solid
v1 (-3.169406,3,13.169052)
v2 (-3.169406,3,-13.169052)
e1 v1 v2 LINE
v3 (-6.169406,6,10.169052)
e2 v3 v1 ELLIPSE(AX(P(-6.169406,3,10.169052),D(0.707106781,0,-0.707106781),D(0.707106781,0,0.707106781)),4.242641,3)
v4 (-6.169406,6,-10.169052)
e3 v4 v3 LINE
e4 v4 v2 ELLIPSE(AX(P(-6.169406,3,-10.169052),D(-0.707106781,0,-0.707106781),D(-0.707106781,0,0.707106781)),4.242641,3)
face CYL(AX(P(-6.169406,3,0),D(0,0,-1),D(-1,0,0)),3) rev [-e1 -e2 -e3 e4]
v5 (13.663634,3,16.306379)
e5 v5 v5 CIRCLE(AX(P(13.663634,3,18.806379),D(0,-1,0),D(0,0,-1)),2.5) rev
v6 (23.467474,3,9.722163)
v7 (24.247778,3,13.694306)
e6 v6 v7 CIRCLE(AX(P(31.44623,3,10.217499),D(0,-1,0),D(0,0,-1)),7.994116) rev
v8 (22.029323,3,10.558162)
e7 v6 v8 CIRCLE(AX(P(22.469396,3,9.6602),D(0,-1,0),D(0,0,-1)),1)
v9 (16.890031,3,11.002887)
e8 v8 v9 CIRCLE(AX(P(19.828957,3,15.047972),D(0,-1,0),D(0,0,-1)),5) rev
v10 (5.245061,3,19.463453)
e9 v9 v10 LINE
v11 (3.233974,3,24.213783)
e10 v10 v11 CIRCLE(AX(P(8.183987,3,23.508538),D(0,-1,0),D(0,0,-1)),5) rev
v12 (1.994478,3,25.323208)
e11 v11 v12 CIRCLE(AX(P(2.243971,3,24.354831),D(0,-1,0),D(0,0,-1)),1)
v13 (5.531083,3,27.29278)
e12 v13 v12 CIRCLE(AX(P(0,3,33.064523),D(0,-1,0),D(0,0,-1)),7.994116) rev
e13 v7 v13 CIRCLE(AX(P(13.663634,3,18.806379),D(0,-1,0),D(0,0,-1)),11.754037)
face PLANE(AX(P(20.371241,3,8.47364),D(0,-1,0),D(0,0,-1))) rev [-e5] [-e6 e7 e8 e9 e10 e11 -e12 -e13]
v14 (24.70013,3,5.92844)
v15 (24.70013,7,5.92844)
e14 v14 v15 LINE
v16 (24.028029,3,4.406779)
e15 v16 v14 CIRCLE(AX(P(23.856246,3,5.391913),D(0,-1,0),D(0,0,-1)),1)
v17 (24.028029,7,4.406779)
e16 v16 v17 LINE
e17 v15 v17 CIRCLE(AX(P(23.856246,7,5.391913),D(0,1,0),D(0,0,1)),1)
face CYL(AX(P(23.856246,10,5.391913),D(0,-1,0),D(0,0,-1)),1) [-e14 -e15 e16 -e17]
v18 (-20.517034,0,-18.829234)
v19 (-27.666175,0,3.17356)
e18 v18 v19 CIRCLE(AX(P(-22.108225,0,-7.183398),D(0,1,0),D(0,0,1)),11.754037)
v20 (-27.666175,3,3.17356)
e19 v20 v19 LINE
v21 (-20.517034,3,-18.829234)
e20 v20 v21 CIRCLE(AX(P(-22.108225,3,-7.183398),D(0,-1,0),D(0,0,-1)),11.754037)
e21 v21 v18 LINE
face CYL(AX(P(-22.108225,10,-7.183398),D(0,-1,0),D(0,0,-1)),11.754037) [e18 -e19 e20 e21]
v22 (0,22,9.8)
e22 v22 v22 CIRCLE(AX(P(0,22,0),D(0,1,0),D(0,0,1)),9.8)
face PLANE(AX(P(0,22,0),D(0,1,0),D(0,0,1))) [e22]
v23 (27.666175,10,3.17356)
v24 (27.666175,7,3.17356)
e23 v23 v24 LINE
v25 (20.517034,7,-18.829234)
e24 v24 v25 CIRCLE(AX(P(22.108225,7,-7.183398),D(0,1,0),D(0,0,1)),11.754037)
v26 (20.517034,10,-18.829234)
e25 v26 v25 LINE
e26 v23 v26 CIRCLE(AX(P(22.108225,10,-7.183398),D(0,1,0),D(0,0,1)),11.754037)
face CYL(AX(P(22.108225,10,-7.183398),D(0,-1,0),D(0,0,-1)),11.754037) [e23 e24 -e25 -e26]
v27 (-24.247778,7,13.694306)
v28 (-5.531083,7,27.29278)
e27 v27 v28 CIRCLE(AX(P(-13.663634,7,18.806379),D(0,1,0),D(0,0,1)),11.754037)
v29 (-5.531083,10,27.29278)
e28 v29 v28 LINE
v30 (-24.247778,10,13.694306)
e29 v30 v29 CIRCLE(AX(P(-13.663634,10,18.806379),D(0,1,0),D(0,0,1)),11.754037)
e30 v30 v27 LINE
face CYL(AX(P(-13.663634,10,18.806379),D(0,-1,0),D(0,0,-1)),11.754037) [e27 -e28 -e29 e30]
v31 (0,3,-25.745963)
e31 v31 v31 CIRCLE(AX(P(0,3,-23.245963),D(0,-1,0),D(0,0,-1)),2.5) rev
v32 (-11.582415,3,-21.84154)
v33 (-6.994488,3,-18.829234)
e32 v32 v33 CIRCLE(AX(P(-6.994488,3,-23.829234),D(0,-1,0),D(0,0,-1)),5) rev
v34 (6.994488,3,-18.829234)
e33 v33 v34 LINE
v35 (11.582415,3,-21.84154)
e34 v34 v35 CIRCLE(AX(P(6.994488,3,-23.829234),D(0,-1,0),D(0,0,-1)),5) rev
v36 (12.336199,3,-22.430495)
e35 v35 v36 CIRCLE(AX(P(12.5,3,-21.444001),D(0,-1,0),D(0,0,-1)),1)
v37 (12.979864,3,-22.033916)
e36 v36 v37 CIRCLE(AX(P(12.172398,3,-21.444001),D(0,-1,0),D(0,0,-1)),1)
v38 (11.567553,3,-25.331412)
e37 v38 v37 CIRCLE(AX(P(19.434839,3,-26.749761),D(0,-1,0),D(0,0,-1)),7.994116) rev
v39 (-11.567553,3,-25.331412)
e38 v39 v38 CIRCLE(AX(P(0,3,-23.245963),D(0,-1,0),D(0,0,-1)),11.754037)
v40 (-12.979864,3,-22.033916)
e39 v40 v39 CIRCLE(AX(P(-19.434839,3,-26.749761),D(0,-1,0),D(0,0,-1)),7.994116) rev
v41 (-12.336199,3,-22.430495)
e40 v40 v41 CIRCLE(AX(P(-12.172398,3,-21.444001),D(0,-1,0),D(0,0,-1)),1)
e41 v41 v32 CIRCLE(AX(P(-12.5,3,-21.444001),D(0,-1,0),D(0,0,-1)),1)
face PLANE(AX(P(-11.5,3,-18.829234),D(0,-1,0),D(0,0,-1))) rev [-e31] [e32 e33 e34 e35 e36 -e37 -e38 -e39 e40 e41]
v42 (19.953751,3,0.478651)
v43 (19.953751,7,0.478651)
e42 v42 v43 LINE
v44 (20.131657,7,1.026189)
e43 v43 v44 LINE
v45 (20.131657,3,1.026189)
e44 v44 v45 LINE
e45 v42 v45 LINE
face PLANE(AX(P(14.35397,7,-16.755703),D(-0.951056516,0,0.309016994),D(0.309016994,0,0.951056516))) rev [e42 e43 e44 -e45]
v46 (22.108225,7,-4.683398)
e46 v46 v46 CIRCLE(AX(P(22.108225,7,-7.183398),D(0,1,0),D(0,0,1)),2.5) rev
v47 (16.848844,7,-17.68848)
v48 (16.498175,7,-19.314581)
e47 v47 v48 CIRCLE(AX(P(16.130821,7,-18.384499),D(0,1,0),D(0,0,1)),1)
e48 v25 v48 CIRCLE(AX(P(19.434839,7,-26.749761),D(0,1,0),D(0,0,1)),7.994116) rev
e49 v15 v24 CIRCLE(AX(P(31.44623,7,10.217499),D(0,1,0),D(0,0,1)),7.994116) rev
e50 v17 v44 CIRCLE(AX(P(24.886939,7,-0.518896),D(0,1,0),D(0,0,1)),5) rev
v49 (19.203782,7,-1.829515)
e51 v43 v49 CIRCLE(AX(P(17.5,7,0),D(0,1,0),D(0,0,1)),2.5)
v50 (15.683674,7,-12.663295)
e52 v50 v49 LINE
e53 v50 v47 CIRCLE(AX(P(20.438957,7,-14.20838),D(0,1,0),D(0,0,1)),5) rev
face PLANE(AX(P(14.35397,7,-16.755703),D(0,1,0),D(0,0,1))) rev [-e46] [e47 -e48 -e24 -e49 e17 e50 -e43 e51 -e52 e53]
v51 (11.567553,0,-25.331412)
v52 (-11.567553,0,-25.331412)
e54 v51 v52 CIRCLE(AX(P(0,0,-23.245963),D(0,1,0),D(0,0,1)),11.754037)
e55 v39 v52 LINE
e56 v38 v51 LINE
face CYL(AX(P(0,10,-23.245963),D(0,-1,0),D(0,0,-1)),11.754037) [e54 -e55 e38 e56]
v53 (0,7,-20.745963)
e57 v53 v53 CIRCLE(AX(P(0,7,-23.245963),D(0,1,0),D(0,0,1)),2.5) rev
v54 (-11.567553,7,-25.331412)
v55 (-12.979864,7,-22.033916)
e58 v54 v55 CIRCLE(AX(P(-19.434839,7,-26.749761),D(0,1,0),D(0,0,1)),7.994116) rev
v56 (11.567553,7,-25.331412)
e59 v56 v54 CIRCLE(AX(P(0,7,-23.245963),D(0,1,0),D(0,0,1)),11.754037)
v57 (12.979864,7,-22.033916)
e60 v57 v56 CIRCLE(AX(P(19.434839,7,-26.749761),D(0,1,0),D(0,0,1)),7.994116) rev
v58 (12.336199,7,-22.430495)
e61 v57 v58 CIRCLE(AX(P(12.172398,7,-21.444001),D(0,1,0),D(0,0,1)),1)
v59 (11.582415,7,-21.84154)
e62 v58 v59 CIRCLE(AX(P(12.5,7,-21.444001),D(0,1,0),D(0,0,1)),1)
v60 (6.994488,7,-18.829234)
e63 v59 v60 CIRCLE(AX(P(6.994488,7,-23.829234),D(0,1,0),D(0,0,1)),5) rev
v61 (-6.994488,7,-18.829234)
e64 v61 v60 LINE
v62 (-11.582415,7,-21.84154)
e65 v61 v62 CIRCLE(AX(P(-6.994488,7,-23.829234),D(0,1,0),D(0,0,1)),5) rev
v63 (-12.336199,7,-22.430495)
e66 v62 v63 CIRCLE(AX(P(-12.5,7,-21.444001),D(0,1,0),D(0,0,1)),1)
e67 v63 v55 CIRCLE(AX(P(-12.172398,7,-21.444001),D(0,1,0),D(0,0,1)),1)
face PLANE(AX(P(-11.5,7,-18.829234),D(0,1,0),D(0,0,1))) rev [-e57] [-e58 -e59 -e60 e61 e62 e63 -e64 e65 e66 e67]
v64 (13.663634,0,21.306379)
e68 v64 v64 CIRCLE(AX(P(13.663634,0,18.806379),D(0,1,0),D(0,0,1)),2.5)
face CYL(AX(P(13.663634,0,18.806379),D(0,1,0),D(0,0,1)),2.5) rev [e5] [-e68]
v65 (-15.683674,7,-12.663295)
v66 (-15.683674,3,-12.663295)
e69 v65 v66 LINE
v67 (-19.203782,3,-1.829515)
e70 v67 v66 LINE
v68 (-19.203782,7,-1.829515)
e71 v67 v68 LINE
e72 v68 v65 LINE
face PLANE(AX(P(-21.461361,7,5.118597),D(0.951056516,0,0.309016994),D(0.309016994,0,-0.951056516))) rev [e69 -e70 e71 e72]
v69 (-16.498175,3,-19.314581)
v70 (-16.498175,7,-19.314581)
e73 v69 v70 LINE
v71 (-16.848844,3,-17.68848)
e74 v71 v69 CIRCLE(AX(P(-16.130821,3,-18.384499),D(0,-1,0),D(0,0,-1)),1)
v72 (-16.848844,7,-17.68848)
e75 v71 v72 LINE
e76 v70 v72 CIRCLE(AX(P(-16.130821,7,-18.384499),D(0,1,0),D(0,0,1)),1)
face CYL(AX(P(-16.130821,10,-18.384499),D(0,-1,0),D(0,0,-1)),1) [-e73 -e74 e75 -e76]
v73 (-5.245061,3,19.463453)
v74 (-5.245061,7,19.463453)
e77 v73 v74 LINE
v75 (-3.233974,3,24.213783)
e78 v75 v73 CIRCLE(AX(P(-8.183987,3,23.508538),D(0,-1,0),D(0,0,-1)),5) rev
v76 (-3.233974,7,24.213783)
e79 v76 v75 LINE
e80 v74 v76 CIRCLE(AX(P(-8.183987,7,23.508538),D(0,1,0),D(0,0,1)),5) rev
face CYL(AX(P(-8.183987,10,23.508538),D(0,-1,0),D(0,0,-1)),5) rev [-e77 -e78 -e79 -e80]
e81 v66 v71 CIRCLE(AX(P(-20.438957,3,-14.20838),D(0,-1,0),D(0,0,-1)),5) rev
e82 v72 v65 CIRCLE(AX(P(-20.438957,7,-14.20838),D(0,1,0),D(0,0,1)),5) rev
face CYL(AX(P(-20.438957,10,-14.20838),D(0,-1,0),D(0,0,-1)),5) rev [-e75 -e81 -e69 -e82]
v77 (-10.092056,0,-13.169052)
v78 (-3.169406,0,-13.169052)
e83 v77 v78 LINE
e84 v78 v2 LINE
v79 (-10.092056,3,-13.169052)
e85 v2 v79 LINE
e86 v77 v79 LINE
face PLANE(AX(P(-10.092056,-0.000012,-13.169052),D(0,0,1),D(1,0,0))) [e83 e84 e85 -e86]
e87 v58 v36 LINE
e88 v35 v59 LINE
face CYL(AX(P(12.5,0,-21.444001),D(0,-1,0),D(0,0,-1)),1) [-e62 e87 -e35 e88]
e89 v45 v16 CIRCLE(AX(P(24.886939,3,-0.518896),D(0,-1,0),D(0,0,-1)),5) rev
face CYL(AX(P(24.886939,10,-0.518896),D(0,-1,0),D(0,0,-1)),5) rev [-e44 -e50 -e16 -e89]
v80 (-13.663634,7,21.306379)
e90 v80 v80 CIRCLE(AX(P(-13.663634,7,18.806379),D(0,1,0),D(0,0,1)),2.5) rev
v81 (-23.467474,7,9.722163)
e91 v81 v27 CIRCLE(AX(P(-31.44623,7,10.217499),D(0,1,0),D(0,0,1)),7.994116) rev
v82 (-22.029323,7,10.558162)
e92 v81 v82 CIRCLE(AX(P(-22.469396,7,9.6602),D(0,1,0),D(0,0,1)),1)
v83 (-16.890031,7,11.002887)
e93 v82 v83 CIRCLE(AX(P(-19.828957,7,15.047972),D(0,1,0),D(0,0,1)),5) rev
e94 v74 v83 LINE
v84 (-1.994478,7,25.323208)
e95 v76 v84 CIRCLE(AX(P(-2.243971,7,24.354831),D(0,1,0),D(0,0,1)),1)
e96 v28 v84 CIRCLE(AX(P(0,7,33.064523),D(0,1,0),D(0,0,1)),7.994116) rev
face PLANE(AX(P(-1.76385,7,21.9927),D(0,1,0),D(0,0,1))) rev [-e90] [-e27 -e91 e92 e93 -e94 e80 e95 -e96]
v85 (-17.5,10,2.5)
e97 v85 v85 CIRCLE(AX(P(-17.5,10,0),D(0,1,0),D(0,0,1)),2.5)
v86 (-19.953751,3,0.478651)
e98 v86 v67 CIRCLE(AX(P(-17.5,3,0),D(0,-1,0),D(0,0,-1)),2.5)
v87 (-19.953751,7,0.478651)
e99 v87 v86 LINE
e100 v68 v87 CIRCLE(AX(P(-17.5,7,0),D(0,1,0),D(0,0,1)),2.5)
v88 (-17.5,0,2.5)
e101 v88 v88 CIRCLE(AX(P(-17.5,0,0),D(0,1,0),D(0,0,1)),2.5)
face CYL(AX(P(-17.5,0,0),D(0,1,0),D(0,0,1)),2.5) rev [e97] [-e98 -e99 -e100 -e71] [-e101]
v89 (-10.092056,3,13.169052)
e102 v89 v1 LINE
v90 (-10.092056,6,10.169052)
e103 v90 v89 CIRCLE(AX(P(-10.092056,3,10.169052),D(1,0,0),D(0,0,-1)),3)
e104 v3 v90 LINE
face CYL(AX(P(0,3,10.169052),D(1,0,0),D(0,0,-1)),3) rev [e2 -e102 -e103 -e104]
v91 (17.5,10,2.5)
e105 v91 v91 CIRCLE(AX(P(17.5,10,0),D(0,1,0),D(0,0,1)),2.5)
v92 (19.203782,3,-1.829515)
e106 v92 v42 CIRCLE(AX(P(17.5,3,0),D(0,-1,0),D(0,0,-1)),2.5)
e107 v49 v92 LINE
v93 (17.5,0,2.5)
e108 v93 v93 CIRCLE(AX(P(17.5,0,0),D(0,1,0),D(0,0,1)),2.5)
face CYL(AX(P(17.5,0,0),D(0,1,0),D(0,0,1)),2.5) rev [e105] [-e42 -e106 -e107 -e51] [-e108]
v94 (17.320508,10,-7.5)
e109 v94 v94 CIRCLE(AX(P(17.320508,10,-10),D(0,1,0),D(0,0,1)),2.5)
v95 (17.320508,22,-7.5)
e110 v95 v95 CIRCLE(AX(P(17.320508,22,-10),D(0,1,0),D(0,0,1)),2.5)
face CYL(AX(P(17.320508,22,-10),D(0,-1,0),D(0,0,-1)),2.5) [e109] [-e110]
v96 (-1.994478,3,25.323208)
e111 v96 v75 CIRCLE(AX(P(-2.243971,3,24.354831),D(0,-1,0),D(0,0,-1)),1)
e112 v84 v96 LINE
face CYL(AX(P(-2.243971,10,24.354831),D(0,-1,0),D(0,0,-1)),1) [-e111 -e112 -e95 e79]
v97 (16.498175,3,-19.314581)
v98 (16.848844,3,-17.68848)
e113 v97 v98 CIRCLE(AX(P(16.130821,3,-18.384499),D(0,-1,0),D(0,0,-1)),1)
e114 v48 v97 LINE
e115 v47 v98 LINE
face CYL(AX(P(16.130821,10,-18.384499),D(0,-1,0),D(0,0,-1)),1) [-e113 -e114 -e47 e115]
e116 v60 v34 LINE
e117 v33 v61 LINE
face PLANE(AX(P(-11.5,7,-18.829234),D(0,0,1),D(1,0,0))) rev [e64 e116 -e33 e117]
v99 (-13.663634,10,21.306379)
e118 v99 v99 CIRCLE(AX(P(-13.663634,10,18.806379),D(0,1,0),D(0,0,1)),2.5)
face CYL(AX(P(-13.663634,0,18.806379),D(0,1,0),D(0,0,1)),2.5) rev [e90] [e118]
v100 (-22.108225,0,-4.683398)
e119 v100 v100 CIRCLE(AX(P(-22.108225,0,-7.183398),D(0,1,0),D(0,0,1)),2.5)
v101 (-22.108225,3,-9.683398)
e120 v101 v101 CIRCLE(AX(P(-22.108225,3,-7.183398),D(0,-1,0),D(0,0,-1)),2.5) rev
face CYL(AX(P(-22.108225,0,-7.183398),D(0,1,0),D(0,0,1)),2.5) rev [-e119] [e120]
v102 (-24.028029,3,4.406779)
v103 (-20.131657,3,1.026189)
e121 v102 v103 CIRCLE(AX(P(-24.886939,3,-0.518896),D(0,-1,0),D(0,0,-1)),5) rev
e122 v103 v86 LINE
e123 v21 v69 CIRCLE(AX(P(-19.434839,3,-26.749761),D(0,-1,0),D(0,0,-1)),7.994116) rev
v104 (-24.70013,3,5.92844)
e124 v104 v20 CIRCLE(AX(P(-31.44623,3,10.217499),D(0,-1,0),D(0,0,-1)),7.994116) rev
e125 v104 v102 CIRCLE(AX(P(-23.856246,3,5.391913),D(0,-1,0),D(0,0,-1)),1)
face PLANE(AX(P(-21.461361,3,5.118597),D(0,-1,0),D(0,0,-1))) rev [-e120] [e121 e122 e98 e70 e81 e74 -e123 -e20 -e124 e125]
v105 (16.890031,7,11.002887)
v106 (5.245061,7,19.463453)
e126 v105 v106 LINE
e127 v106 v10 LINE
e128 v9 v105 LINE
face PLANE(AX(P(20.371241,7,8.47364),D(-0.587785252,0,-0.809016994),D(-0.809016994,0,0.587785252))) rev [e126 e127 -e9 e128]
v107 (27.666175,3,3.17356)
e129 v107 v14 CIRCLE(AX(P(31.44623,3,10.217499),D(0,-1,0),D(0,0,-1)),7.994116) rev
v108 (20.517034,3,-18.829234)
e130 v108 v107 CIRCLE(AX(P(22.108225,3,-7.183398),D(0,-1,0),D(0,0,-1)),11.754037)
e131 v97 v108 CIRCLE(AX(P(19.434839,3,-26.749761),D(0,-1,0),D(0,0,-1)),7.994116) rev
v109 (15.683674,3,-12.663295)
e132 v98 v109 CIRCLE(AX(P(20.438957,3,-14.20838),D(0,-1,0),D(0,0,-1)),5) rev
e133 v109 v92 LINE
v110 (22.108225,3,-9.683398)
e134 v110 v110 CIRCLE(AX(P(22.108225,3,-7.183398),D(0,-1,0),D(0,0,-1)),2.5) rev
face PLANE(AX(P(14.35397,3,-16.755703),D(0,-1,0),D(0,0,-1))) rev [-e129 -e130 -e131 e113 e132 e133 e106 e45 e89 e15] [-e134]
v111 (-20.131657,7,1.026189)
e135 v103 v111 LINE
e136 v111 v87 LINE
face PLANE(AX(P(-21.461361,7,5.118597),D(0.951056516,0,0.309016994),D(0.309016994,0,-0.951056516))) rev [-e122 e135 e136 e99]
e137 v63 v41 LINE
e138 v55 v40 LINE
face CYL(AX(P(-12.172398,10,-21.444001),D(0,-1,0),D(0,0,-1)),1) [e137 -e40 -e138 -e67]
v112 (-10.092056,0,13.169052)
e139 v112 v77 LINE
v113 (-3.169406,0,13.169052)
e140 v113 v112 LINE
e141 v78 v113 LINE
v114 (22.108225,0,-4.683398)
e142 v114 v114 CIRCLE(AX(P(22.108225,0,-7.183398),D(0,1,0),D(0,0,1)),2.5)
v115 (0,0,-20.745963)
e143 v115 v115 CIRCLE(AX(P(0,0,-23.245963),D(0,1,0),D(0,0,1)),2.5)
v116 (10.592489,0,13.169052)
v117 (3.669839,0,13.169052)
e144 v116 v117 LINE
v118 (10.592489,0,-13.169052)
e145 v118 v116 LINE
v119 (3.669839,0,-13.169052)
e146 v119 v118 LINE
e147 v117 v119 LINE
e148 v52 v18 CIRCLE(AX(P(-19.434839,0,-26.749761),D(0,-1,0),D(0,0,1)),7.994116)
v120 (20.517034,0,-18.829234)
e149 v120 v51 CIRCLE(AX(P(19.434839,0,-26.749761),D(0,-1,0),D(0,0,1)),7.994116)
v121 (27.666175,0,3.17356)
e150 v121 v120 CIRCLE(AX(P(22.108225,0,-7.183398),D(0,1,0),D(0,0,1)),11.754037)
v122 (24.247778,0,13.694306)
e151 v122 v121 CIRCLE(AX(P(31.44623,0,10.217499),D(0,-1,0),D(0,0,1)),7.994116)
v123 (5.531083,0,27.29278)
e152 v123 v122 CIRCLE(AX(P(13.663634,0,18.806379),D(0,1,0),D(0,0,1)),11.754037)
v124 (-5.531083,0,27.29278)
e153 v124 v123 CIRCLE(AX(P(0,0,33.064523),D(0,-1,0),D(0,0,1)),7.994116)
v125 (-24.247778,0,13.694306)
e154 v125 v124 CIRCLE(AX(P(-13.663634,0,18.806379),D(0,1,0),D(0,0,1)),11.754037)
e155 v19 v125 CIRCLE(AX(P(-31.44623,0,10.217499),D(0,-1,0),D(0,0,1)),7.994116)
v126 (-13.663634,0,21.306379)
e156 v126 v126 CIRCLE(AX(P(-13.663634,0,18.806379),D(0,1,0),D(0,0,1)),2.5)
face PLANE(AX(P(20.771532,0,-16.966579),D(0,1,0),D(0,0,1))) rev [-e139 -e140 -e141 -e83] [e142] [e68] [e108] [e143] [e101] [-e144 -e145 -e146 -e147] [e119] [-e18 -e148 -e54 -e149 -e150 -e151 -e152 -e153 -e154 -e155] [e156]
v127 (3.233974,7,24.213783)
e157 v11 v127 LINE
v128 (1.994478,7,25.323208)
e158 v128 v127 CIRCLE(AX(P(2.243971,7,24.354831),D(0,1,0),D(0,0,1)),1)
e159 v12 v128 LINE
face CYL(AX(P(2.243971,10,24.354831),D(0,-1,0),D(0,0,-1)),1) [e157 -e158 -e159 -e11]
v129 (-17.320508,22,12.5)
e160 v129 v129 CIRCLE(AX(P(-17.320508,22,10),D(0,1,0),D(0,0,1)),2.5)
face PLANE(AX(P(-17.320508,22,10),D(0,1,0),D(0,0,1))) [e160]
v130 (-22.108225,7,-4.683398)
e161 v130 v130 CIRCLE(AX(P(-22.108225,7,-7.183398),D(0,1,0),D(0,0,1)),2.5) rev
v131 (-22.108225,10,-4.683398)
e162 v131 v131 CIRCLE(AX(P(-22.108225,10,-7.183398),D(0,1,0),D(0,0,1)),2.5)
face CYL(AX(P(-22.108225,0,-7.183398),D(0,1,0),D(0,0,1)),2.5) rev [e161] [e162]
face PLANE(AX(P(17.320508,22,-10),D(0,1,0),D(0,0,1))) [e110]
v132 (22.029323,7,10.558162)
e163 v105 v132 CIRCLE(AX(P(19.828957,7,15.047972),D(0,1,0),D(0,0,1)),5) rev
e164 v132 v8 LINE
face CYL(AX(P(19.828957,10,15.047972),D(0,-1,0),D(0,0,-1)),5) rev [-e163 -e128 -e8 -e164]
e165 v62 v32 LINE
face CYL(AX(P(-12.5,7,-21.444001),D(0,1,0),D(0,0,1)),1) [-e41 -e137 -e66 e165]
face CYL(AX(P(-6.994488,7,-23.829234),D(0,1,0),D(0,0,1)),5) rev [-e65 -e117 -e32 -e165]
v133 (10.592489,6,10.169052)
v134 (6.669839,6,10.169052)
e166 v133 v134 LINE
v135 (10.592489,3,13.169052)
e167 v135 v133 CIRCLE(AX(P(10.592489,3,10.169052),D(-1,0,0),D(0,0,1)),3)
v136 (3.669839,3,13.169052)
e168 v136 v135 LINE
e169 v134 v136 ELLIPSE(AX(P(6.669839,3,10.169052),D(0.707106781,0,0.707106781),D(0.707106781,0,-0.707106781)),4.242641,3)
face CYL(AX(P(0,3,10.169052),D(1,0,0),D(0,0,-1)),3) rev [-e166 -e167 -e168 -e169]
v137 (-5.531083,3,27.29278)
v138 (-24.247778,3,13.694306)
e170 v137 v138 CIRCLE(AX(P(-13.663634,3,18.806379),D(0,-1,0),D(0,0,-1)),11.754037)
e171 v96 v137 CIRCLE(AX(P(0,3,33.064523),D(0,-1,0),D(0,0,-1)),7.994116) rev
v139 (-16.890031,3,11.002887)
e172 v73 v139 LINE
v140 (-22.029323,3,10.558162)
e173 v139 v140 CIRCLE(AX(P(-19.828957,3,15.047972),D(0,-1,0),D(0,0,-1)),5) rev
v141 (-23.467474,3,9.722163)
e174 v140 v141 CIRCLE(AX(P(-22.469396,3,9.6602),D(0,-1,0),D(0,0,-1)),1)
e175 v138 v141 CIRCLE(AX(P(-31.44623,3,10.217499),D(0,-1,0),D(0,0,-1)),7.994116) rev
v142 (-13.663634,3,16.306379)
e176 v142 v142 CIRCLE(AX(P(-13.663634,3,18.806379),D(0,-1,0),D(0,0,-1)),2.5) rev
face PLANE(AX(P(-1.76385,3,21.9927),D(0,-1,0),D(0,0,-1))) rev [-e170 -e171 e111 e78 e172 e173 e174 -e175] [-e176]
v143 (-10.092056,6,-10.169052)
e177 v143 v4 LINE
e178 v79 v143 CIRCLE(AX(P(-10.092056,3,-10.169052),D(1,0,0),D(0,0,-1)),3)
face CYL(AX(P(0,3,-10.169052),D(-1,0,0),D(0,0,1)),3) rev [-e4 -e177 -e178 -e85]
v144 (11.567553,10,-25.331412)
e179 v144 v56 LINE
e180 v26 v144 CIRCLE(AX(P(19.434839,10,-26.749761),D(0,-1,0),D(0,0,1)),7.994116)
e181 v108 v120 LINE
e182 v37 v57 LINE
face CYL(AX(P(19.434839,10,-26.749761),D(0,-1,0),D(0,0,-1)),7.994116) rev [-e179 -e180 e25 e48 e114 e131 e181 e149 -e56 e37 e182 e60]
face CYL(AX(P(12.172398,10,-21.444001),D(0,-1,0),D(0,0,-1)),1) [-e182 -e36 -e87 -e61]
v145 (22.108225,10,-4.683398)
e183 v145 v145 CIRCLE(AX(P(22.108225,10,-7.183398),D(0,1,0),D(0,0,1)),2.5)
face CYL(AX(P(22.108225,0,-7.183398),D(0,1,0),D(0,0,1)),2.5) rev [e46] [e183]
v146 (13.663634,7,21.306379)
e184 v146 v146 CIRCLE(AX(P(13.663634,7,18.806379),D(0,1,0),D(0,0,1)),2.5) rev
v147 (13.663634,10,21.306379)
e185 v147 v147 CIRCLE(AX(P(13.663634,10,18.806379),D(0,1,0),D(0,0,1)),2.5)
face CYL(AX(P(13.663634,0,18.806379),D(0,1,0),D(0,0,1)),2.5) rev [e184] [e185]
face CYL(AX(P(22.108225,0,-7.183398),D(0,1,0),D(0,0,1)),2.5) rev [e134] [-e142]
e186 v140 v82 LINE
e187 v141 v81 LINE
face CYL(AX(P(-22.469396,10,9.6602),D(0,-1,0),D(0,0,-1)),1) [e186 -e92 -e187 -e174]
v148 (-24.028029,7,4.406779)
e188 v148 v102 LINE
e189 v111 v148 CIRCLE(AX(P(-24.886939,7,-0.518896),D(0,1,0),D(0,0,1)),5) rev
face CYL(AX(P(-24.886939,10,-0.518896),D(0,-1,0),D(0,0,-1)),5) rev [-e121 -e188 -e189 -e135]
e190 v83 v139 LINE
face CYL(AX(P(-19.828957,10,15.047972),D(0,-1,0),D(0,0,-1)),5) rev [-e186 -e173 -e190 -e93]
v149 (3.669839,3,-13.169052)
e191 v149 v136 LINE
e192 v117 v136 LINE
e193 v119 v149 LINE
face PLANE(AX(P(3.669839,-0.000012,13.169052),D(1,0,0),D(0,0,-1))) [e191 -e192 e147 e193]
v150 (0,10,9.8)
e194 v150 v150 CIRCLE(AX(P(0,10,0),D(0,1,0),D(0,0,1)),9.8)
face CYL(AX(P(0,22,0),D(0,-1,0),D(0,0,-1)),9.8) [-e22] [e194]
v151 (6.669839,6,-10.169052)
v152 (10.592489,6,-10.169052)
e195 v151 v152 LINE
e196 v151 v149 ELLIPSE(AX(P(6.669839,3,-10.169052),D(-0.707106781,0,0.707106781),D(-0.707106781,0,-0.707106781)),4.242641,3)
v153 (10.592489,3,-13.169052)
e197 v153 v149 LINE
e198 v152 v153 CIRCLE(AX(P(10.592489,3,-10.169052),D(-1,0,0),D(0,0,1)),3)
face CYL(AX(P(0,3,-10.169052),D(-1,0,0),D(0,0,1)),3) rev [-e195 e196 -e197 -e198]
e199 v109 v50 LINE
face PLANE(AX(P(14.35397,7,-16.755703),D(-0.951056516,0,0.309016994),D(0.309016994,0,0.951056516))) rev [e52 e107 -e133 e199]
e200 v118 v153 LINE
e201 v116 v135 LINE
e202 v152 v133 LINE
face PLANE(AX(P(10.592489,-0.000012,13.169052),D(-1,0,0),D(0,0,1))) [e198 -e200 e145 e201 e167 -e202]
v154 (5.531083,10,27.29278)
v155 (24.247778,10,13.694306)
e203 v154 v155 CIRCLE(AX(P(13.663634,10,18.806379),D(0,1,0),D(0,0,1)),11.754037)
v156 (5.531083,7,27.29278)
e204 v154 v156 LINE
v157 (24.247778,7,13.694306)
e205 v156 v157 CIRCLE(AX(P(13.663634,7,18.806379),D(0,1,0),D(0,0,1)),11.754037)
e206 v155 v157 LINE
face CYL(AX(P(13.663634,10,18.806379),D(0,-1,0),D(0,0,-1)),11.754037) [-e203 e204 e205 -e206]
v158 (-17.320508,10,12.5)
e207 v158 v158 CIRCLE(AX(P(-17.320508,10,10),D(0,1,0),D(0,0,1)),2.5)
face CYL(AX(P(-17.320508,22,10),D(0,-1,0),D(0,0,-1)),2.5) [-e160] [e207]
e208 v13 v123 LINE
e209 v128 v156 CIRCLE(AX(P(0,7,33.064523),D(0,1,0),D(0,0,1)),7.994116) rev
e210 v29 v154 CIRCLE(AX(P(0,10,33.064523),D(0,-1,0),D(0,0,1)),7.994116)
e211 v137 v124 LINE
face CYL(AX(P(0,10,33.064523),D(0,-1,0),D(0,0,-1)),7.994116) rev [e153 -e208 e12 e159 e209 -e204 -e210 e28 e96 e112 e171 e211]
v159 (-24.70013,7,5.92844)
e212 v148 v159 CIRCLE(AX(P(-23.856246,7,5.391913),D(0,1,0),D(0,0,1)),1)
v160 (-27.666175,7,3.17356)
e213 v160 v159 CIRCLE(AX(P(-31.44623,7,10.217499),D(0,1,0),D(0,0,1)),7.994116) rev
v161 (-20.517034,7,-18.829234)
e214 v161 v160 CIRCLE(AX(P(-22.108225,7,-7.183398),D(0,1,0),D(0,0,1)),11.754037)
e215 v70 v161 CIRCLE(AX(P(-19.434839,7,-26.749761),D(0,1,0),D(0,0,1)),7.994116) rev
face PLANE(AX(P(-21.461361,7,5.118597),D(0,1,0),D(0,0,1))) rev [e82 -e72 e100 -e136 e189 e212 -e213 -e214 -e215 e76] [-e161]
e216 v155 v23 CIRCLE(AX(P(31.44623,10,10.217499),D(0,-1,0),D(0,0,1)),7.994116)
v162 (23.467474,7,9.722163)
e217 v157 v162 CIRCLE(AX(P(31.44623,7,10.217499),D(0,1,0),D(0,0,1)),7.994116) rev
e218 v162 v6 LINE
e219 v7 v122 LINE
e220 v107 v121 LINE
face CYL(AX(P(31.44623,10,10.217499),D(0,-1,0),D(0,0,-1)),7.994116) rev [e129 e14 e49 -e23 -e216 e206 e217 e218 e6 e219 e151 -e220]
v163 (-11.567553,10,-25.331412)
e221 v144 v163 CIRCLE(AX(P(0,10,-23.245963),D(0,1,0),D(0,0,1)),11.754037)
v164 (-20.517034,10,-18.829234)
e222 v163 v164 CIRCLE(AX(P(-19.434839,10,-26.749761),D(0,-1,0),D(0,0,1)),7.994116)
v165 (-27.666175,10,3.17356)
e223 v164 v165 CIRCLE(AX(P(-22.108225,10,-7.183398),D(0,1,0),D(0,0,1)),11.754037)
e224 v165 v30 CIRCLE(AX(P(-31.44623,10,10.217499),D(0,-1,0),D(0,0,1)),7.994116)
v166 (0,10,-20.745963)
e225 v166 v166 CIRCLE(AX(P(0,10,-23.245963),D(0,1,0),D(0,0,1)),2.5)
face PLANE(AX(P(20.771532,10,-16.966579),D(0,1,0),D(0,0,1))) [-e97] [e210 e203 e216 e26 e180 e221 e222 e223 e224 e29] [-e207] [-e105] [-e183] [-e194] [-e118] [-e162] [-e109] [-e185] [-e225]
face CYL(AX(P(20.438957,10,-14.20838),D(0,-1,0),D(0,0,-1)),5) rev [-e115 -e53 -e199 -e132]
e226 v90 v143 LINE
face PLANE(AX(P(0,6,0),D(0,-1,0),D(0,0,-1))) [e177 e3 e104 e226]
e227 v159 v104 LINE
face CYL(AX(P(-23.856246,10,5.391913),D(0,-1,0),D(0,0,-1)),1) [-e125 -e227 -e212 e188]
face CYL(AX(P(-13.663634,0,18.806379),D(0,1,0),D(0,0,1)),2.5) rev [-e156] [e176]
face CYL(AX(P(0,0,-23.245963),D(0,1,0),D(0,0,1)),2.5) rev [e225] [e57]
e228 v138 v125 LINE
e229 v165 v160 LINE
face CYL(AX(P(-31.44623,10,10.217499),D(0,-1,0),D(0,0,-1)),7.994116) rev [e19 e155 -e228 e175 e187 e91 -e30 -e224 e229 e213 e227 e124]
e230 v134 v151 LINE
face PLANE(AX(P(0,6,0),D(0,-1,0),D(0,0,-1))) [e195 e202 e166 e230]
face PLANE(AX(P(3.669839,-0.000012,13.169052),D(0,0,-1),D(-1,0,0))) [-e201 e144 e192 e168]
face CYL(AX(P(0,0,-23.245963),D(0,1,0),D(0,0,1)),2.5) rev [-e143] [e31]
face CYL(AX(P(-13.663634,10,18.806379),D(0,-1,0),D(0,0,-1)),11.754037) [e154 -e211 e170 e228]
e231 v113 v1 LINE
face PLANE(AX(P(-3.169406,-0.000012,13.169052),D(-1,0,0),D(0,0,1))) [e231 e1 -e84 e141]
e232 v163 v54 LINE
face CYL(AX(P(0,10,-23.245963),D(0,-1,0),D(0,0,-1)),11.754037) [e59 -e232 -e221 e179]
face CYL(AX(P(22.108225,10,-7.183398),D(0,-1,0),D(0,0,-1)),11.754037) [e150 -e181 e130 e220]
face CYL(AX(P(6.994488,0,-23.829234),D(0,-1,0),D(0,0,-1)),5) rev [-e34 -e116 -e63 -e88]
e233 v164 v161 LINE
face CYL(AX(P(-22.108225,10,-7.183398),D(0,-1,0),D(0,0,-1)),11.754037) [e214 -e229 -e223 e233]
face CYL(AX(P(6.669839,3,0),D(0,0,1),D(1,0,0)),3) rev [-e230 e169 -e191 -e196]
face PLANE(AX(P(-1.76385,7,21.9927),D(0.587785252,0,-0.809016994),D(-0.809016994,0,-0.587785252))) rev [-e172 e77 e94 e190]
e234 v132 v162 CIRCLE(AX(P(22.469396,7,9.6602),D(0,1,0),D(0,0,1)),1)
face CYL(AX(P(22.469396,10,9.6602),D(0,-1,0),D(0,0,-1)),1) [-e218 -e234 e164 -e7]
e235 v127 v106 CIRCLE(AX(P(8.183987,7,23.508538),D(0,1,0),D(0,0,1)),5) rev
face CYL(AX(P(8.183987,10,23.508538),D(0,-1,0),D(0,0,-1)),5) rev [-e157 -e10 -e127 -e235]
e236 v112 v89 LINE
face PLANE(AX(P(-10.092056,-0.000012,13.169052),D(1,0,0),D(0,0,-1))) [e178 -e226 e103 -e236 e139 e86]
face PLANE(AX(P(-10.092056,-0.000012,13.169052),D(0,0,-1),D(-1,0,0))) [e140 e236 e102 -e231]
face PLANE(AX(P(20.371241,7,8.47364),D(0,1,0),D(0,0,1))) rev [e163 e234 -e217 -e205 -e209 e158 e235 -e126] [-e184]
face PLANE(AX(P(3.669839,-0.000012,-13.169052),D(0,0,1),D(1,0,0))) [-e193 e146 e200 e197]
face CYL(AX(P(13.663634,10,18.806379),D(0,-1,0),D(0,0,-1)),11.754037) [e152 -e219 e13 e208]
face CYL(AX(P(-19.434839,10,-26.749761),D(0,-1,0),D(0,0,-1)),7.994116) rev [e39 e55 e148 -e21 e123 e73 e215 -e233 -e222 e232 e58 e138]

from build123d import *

# Parameters (mm, degrees)
SALIENTE_EXTRUIR1_DEPTH    = 10
CROQUIS2_R                 = 2.5
CORTAR_EXTRUIR1_DEPTH      = 10
CROQUIS3_R                 = 9.8
SALIENTE_EXTRUIR2_DEPTH    = 12
CROQUIS4_W                 = 17.653456823
CROQUIS4_H                 = 4
CORTAR_EXTRUIR2_DEPTH      = 11.5
CORTAR_EXTRUIR3_DEPTH      = 62.373730343
CORTAR_EXTRUIR3_DEPTH_BACK = 62.373730343
CROQUIS5_W                 = 3.232473087
CROQUIS5_H                 = 4
REDONDEO1_R                = 1
REDONDEO2_R                = 5
MATRIZC7_COUNT             = 5
REDONDEO3_R                = 1
REDONDEO4_R                = 5
CORTAR_EXTRUIR4_DEPTH      = 54.438308108
CORTAR_EXTRUIR4_DEPTH_BACK = 6
CROQUIS7_W                 = 6.922650149
CROQUIS7_H                 = 26.338104106
REDONDEO5_R                = 3
CROQUIS9_R                 = 2.5
CORTAR_EXTRUIR5_DEPTH      = 22
CROQUIS10_R                = 2.5
SALIENTE_EXTRUIR3_DEPTH    = 12


with BuildPart() as part:
    # Croquis1 → Saliente-Extruir1 (new body)
    with BuildSketch(Plane(origin=(0, 0, 0), x_dir=(1, 0, 0), z_dir=(0, 1, 0))):
        with BuildLine():
            ThreePointArc((11.567553172, 25.331412183), (0, 35), (-11.567553172, 25.331412183))
            ThreePointArc((-11.567553172, 25.331412183), (-14.736015149, 20.282384831), (-20.51703411, 18.829233678))
            ThreePointArc((-20.51703411, 18.829233678), (-33.28697807, 10.815594803), (-27.666175138, -3.173559966))
            ThreePointArc((-27.666175138, -3.173559966), (-23.843373369, -7.747181632), (-24.247777601, -13.694305788))
            ThreePointArc((-24.247777601, -13.694305788), (-20.57248383, -28.315594803), (-5.531083401, -27.292780108))
            ThreePointArc((-5.531083401, -27.292780108), (0, -25.070406396), (5.531083401, -27.292780108))
            ThreePointArc((5.531083401, -27.292780108), (20.57248383, -28.315594803), (24.247777601, -13.694305788))
            ThreePointArc((24.247777601, -13.694305788), (23.843373369, -7.747181632), (27.666175138, -3.173559966))
            ThreePointArc((27.666175138, -3.173559966), (33.28697807, 10.815594803), (20.51703411, 18.829233678))
            ThreePointArc((20.51703411, 18.829233678), (14.736015149, 20.282384831), (11.567553172, 25.331412183))
        make_face()
    extrude(amount=SALIENTE_EXTRUIR1_DEPTH)

    # Croquis2 → Cortar-Extruir1 (cut)
    with BuildSketch(Plane(origin=(0, 10, 0), x_dir=(1, 0, 0), z_dir=(0, 1, 0))):
        with Locations(Location((-22.108224643, 7.183397635, 0), (0, 0, 270))):
            Circle(CROQUIS2_R)
        with Locations(Location((0, 23.245963057, 0), (0, 0, 270))):
            Circle(CROQUIS2_R)
        with Locations(Location((22.108224643, 7.183397635, 0), (0, 0, 270))):
            Circle(CROQUIS2_R)
        with Locations(Location((13.66363426, -18.806379164, 0), (0, 0, 270))):
            Circle(CROQUIS2_R)
        with Locations(Location((-13.66363426, -18.806379164, 0), (0, 0, 270))):
            Circle(CROQUIS2_R)
    extrude(amount=-CORTAR_EXTRUIR1_DEPTH, mode=Mode.SUBTRACT)

    # Croquis3 → Saliente-Extruir2 (add)
    with BuildSketch(Plane(origin=(0, 10, 0), x_dir=(1, 0, 0), z_dir=(0, 1, 0))):
        with Locations(Location((0, 0, 0), (0, 0, 270))):
            Circle(CROQUIS3_R)
    extrude(amount=SALIENTE_EXTRUIR2_DEPTH)

    # Croquis4 → Cortar-Extruir2 (cut, symmetric)
    with BuildSketch(Plane(origin=(0, 0, 0), x_dir=(0, 0, -1), z_dir=(1, 0, 0))):
        with Locations((27.65596209, 5)):
            Rectangle(CROQUIS4_W, CROQUIS4_H)
    cortar_extruir2 = extrude(amount=CORTAR_EXTRUIR2_DEPTH, both=True, mode=Mode.SUBTRACT)

    # Croquis5 → Cortar-Extruir3 (cut, two sides: drawn at the far end of the back side and taken through both)
    with BuildSketch(Plane.ZY.offset(-11.5).offset(-CORTAR_EXTRUIR3_DEPTH_BACK)):
        with Locations((-24.060237665, 5)):
            Rectangle(CROQUIS5_W, CROQUIS5_H)
    extrude(amount=CORTAR_EXTRUIR3_DEPTH + CORTAR_EXTRUIR3_DEPTH_BACK, mode=Mode.SUBTRACT)

    # Redondeo1
    # the kernel refuses this fillet: 1 mm, written as the material it takes off along each edge
    with BuildSketch(Plane(origin=(11.5, 3, -22.444001121), x_dir=(1, 0, 0), z_dir=(0, 1, 0)), Plane(origin=(-11.5, 3, -22.444001121), x_dir=(0, 0, 1), z_dir=(0, 1, 0))) as redondeo1_piece_1:
        with BuildLine():
            CenterArc((REDONDEO1_R, -REDONDEO1_R), REDONDEO1_R, 90, 90)
            Line((0, -REDONDEO1_R), (0, 0))
            Line((0, 0), (REDONDEO1_R, 0))
        make_face()
    extrude(amount=4, mode=Mode.SUBTRACT)
    with BuildSketch(Plane(origin=(12.699385644, 7, -22.444001121), x_dir=(-1, 0, 0), z_dir=(0, -1, 0))) as redondeo1_piece_2:
        with BuildLine():
            CenterArc((0.526987375, -1), REDONDEO1_R, 90, 53.849058394)
            ThreePointArc((-0.280478336, -0.410085493), (-0.137052587, -0.207222212), (0, 0))
            Line((0, 0), (0.526987375, 0))
        make_face()
    extrude(amount=4, mode=Mode.SUBTRACT)
    with BuildSketch(Plane(origin=(-12.699385644, 7, -22.444001121), x_dir=(1, 0, 0), z_dir=(0, -1, 0))) as redondeo1_piece_3:
        with BuildLine():
            CenterArc((0.526987375, 1), REDONDEO1_R, 216.150941606, 53.849058394)
            ThreePointArc((-0.280478336, 0.410085493), (-0.137052587, 0.207222212), (0, 0))
            Line((0, 0), (0.526987375, 0))
        make_face()
    extrude(amount=4, mode=Mode.SUBTRACT)

    # Redondeo2
    redondeo2_edges = [part.edges().sort_by_distance(p)[0] for p in [
        (-11.5, 5, -18.829233678),
        (11.5, 5, -18.829233678),
    ]]
    fillet(redondeo2_edges, radius=REDONDEO2_R)

    # MatrizC7: Cortar-Extruir2 ×5 about axis
    matrizc7_axis = Axis((0, 0, 0), (0, 1, 0))
    for i in range(1, MATRIZC7_COUNT):
        add(cortar_extruir2.rotate(matrizc7_axis, i * 360 / MATRIZC7_COUNT), mode=Mode.SUBTRACT)

    # Redondeo3
    # the kernel refuses this fillet: 1 mm, written as the material it takes off along each edge
    with BuildSketch(Plane(origin=(27.973473546, 7, 3.002683051), x_dir=(-0.745583502081635, 0, 0.6664122158421801), z_dir=(0, -1, 0)), Plane(origin=(5.788557435, 7, 27.532234391), x_dir=(-0.864193653284182, 0, -0.5031593481426527), z_dir=(0, -1, 0)), Plane(origin=(-24.395948306, 7, 14.013173589), x_dir=(0.21148245149008985, 0, -0.9773817947515403), z_dir=(0, -1, 0)), Plane(origin=(-20.866082676, 7, -18.871616823), x_dir=(0.9948969963292142, 0, -0.10089582099922498), z_dir=(0, -1, 0))) as redondeo3_piece_1:
        with BuildLine():
            CenterArc((4.661949033, 0.96239971), REDONDEO3_R, 113.790758155, 140.447525624)
            Line((4.258551325, 1.877424458), (4.218211554, 1.968926933))
            Line((4.218211554, 1.968926933), (-0.040339771, 0.091502475))
            Line((-0.040339771, 0.091502475), (0.020546947, -0.097866353))
            ThreePointArc((0.020546947, -0.097866353), (0.366456105, -0.019823583), (4.363148054, -0.096239971))
            Line((4.363148054, -0.096239971), (4.390311779, 0))
        make_face()
    extrude(amount=4, mode=Mode.SUBTRACT)
    with BuildSketch(Plane(origin=(20.866082676, 7, -18.871616823), x_dir=(-0.9948969963292025, 0, -0.10089582099933926), z_dir=(0, -1, 0)), Plane(origin=(24.395948306, 7, 14.013173589), x_dir=(-0.2114824514899068, 0, -0.9773817947515798), z_dir=(0, -1, 0)), Plane(origin=(-5.788557435, 7, 27.532234391), x_dir=(0.8641936532842898, 0, -0.5031593481424677), z_dir=(0, -1, 0)), Plane(origin=(-27.973473546, 7, 3.002683051), x_dir=(0.7455835020815682, 0, 0.666412215842255), z_dir=(0, -1, 0))) as redondeo3_piece_2:
        with BuildLine():
            CenterArc((4.661949033, -0.96239971), REDONDEO3_R, 105.761716221, 140.447525624)
            Line((4.258551325, -1.877424458), (4.218211554, -1.968926933))
            Line((4.218211554, -1.968926933), (-0.040339771, -0.091502475))
            Line((-0.040339771, -0.091502475), (0.020546947, 0.097866353))
            ThreePointArc((0.020546947, 0.097866353), (0.366456105, 0.019823583), (4.363148054, 0.096239971))
            Line((4.363148054, 0.096239971), (4.390311779, 0))
        make_face()
    extrude(amount=4, mode=Mode.SUBTRACT)

    # Redondeo4
    redondeo4_edges = [part.edges().sort_by_distance(p)[0] for p in [
        (14.353969951, 5, -16.755703135),
        (21.461360822, 5, 5.11859674),
        (20.371241303, 5, 8.473639636),
        (1.763850433, 5, 21.992700438),
        (-1.763850433, 5, 21.992700438),
        (-20.371241303, 5, 8.473639636),
        (-21.461360822, 5, 5.11859674),
        (-14.353969951, 5, -16.755703135),
    ]]
    fillet(redondeo4_edges, radius=REDONDEO4_R)

    # Croquis7 → Cortar-Extruir4 (cut, two sides: drawn at the far end of the back side and taken through both)
    with BuildSketch(Plane.XZ.offset(-CORTAR_EXTRUIR4_DEPTH_BACK)):
        with Locations((-6.630731168, 0)):
            Rectangle(CROQUIS7_W, CROQUIS7_H)
        with Locations((7.131163709, 0)):
            Rectangle(CROQUIS7_W, CROQUIS7_H)
    extrude(amount=CORTAR_EXTRUIR4_DEPTH + CORTAR_EXTRUIR4_DEPTH_BACK, mode=Mode.SUBTRACT)

    # Redondeo5
    redondeo5_edges = [part.edges().sort_by_distance(p)[0] for p in [
        (-6.630731167, 6, -13.169052053),
        (-3.169406093, 6, 0),
        (-6.630731167, 6, 13.169052053),
        (3.669838634, 6, 0),
        (7.131163708, 6, -13.169052053),
        (7.131163708, 6, 13.169052053),
    ]]
    fillet(redondeo5_edges, radius=REDONDEO5_R)

    # Croquis9 → Cortar-Extruir5 (cut)
    with BuildSketch(Plane(origin=(0, 22, 0), x_dir=(1, 0, 0), z_dir=(0, 1, 0))):
        with Locations(Location((17.5, 0, 0), (0, 0, 270))):
            Circle(CROQUIS9_R)
        with Locations(Location((-17.5, 0, 0), (0, 0, 270))):
            Circle(CROQUIS9_R)
    extrude(amount=-CORTAR_EXTRUIR5_DEPTH, mode=Mode.SUBTRACT)

    # Croquis10 → Saliente-Extruir3 (add)
    with BuildSketch(Plane(origin=(0, 10, 0), x_dir=(1, 0, 0), z_dir=(0, 1, 0))):
        with Locations(Location((17.320508076, 10, 0), (0, 0, 270))):
            Circle(CROQUIS10_R)
        with Locations(Location((-17.320508076, -10, 0), (0, 0, 270))):
            Circle(CROQUIS10_R)
    extrude(amount=SALIENTE_EXTRUIR3_DEPTH)


solid = part.part
